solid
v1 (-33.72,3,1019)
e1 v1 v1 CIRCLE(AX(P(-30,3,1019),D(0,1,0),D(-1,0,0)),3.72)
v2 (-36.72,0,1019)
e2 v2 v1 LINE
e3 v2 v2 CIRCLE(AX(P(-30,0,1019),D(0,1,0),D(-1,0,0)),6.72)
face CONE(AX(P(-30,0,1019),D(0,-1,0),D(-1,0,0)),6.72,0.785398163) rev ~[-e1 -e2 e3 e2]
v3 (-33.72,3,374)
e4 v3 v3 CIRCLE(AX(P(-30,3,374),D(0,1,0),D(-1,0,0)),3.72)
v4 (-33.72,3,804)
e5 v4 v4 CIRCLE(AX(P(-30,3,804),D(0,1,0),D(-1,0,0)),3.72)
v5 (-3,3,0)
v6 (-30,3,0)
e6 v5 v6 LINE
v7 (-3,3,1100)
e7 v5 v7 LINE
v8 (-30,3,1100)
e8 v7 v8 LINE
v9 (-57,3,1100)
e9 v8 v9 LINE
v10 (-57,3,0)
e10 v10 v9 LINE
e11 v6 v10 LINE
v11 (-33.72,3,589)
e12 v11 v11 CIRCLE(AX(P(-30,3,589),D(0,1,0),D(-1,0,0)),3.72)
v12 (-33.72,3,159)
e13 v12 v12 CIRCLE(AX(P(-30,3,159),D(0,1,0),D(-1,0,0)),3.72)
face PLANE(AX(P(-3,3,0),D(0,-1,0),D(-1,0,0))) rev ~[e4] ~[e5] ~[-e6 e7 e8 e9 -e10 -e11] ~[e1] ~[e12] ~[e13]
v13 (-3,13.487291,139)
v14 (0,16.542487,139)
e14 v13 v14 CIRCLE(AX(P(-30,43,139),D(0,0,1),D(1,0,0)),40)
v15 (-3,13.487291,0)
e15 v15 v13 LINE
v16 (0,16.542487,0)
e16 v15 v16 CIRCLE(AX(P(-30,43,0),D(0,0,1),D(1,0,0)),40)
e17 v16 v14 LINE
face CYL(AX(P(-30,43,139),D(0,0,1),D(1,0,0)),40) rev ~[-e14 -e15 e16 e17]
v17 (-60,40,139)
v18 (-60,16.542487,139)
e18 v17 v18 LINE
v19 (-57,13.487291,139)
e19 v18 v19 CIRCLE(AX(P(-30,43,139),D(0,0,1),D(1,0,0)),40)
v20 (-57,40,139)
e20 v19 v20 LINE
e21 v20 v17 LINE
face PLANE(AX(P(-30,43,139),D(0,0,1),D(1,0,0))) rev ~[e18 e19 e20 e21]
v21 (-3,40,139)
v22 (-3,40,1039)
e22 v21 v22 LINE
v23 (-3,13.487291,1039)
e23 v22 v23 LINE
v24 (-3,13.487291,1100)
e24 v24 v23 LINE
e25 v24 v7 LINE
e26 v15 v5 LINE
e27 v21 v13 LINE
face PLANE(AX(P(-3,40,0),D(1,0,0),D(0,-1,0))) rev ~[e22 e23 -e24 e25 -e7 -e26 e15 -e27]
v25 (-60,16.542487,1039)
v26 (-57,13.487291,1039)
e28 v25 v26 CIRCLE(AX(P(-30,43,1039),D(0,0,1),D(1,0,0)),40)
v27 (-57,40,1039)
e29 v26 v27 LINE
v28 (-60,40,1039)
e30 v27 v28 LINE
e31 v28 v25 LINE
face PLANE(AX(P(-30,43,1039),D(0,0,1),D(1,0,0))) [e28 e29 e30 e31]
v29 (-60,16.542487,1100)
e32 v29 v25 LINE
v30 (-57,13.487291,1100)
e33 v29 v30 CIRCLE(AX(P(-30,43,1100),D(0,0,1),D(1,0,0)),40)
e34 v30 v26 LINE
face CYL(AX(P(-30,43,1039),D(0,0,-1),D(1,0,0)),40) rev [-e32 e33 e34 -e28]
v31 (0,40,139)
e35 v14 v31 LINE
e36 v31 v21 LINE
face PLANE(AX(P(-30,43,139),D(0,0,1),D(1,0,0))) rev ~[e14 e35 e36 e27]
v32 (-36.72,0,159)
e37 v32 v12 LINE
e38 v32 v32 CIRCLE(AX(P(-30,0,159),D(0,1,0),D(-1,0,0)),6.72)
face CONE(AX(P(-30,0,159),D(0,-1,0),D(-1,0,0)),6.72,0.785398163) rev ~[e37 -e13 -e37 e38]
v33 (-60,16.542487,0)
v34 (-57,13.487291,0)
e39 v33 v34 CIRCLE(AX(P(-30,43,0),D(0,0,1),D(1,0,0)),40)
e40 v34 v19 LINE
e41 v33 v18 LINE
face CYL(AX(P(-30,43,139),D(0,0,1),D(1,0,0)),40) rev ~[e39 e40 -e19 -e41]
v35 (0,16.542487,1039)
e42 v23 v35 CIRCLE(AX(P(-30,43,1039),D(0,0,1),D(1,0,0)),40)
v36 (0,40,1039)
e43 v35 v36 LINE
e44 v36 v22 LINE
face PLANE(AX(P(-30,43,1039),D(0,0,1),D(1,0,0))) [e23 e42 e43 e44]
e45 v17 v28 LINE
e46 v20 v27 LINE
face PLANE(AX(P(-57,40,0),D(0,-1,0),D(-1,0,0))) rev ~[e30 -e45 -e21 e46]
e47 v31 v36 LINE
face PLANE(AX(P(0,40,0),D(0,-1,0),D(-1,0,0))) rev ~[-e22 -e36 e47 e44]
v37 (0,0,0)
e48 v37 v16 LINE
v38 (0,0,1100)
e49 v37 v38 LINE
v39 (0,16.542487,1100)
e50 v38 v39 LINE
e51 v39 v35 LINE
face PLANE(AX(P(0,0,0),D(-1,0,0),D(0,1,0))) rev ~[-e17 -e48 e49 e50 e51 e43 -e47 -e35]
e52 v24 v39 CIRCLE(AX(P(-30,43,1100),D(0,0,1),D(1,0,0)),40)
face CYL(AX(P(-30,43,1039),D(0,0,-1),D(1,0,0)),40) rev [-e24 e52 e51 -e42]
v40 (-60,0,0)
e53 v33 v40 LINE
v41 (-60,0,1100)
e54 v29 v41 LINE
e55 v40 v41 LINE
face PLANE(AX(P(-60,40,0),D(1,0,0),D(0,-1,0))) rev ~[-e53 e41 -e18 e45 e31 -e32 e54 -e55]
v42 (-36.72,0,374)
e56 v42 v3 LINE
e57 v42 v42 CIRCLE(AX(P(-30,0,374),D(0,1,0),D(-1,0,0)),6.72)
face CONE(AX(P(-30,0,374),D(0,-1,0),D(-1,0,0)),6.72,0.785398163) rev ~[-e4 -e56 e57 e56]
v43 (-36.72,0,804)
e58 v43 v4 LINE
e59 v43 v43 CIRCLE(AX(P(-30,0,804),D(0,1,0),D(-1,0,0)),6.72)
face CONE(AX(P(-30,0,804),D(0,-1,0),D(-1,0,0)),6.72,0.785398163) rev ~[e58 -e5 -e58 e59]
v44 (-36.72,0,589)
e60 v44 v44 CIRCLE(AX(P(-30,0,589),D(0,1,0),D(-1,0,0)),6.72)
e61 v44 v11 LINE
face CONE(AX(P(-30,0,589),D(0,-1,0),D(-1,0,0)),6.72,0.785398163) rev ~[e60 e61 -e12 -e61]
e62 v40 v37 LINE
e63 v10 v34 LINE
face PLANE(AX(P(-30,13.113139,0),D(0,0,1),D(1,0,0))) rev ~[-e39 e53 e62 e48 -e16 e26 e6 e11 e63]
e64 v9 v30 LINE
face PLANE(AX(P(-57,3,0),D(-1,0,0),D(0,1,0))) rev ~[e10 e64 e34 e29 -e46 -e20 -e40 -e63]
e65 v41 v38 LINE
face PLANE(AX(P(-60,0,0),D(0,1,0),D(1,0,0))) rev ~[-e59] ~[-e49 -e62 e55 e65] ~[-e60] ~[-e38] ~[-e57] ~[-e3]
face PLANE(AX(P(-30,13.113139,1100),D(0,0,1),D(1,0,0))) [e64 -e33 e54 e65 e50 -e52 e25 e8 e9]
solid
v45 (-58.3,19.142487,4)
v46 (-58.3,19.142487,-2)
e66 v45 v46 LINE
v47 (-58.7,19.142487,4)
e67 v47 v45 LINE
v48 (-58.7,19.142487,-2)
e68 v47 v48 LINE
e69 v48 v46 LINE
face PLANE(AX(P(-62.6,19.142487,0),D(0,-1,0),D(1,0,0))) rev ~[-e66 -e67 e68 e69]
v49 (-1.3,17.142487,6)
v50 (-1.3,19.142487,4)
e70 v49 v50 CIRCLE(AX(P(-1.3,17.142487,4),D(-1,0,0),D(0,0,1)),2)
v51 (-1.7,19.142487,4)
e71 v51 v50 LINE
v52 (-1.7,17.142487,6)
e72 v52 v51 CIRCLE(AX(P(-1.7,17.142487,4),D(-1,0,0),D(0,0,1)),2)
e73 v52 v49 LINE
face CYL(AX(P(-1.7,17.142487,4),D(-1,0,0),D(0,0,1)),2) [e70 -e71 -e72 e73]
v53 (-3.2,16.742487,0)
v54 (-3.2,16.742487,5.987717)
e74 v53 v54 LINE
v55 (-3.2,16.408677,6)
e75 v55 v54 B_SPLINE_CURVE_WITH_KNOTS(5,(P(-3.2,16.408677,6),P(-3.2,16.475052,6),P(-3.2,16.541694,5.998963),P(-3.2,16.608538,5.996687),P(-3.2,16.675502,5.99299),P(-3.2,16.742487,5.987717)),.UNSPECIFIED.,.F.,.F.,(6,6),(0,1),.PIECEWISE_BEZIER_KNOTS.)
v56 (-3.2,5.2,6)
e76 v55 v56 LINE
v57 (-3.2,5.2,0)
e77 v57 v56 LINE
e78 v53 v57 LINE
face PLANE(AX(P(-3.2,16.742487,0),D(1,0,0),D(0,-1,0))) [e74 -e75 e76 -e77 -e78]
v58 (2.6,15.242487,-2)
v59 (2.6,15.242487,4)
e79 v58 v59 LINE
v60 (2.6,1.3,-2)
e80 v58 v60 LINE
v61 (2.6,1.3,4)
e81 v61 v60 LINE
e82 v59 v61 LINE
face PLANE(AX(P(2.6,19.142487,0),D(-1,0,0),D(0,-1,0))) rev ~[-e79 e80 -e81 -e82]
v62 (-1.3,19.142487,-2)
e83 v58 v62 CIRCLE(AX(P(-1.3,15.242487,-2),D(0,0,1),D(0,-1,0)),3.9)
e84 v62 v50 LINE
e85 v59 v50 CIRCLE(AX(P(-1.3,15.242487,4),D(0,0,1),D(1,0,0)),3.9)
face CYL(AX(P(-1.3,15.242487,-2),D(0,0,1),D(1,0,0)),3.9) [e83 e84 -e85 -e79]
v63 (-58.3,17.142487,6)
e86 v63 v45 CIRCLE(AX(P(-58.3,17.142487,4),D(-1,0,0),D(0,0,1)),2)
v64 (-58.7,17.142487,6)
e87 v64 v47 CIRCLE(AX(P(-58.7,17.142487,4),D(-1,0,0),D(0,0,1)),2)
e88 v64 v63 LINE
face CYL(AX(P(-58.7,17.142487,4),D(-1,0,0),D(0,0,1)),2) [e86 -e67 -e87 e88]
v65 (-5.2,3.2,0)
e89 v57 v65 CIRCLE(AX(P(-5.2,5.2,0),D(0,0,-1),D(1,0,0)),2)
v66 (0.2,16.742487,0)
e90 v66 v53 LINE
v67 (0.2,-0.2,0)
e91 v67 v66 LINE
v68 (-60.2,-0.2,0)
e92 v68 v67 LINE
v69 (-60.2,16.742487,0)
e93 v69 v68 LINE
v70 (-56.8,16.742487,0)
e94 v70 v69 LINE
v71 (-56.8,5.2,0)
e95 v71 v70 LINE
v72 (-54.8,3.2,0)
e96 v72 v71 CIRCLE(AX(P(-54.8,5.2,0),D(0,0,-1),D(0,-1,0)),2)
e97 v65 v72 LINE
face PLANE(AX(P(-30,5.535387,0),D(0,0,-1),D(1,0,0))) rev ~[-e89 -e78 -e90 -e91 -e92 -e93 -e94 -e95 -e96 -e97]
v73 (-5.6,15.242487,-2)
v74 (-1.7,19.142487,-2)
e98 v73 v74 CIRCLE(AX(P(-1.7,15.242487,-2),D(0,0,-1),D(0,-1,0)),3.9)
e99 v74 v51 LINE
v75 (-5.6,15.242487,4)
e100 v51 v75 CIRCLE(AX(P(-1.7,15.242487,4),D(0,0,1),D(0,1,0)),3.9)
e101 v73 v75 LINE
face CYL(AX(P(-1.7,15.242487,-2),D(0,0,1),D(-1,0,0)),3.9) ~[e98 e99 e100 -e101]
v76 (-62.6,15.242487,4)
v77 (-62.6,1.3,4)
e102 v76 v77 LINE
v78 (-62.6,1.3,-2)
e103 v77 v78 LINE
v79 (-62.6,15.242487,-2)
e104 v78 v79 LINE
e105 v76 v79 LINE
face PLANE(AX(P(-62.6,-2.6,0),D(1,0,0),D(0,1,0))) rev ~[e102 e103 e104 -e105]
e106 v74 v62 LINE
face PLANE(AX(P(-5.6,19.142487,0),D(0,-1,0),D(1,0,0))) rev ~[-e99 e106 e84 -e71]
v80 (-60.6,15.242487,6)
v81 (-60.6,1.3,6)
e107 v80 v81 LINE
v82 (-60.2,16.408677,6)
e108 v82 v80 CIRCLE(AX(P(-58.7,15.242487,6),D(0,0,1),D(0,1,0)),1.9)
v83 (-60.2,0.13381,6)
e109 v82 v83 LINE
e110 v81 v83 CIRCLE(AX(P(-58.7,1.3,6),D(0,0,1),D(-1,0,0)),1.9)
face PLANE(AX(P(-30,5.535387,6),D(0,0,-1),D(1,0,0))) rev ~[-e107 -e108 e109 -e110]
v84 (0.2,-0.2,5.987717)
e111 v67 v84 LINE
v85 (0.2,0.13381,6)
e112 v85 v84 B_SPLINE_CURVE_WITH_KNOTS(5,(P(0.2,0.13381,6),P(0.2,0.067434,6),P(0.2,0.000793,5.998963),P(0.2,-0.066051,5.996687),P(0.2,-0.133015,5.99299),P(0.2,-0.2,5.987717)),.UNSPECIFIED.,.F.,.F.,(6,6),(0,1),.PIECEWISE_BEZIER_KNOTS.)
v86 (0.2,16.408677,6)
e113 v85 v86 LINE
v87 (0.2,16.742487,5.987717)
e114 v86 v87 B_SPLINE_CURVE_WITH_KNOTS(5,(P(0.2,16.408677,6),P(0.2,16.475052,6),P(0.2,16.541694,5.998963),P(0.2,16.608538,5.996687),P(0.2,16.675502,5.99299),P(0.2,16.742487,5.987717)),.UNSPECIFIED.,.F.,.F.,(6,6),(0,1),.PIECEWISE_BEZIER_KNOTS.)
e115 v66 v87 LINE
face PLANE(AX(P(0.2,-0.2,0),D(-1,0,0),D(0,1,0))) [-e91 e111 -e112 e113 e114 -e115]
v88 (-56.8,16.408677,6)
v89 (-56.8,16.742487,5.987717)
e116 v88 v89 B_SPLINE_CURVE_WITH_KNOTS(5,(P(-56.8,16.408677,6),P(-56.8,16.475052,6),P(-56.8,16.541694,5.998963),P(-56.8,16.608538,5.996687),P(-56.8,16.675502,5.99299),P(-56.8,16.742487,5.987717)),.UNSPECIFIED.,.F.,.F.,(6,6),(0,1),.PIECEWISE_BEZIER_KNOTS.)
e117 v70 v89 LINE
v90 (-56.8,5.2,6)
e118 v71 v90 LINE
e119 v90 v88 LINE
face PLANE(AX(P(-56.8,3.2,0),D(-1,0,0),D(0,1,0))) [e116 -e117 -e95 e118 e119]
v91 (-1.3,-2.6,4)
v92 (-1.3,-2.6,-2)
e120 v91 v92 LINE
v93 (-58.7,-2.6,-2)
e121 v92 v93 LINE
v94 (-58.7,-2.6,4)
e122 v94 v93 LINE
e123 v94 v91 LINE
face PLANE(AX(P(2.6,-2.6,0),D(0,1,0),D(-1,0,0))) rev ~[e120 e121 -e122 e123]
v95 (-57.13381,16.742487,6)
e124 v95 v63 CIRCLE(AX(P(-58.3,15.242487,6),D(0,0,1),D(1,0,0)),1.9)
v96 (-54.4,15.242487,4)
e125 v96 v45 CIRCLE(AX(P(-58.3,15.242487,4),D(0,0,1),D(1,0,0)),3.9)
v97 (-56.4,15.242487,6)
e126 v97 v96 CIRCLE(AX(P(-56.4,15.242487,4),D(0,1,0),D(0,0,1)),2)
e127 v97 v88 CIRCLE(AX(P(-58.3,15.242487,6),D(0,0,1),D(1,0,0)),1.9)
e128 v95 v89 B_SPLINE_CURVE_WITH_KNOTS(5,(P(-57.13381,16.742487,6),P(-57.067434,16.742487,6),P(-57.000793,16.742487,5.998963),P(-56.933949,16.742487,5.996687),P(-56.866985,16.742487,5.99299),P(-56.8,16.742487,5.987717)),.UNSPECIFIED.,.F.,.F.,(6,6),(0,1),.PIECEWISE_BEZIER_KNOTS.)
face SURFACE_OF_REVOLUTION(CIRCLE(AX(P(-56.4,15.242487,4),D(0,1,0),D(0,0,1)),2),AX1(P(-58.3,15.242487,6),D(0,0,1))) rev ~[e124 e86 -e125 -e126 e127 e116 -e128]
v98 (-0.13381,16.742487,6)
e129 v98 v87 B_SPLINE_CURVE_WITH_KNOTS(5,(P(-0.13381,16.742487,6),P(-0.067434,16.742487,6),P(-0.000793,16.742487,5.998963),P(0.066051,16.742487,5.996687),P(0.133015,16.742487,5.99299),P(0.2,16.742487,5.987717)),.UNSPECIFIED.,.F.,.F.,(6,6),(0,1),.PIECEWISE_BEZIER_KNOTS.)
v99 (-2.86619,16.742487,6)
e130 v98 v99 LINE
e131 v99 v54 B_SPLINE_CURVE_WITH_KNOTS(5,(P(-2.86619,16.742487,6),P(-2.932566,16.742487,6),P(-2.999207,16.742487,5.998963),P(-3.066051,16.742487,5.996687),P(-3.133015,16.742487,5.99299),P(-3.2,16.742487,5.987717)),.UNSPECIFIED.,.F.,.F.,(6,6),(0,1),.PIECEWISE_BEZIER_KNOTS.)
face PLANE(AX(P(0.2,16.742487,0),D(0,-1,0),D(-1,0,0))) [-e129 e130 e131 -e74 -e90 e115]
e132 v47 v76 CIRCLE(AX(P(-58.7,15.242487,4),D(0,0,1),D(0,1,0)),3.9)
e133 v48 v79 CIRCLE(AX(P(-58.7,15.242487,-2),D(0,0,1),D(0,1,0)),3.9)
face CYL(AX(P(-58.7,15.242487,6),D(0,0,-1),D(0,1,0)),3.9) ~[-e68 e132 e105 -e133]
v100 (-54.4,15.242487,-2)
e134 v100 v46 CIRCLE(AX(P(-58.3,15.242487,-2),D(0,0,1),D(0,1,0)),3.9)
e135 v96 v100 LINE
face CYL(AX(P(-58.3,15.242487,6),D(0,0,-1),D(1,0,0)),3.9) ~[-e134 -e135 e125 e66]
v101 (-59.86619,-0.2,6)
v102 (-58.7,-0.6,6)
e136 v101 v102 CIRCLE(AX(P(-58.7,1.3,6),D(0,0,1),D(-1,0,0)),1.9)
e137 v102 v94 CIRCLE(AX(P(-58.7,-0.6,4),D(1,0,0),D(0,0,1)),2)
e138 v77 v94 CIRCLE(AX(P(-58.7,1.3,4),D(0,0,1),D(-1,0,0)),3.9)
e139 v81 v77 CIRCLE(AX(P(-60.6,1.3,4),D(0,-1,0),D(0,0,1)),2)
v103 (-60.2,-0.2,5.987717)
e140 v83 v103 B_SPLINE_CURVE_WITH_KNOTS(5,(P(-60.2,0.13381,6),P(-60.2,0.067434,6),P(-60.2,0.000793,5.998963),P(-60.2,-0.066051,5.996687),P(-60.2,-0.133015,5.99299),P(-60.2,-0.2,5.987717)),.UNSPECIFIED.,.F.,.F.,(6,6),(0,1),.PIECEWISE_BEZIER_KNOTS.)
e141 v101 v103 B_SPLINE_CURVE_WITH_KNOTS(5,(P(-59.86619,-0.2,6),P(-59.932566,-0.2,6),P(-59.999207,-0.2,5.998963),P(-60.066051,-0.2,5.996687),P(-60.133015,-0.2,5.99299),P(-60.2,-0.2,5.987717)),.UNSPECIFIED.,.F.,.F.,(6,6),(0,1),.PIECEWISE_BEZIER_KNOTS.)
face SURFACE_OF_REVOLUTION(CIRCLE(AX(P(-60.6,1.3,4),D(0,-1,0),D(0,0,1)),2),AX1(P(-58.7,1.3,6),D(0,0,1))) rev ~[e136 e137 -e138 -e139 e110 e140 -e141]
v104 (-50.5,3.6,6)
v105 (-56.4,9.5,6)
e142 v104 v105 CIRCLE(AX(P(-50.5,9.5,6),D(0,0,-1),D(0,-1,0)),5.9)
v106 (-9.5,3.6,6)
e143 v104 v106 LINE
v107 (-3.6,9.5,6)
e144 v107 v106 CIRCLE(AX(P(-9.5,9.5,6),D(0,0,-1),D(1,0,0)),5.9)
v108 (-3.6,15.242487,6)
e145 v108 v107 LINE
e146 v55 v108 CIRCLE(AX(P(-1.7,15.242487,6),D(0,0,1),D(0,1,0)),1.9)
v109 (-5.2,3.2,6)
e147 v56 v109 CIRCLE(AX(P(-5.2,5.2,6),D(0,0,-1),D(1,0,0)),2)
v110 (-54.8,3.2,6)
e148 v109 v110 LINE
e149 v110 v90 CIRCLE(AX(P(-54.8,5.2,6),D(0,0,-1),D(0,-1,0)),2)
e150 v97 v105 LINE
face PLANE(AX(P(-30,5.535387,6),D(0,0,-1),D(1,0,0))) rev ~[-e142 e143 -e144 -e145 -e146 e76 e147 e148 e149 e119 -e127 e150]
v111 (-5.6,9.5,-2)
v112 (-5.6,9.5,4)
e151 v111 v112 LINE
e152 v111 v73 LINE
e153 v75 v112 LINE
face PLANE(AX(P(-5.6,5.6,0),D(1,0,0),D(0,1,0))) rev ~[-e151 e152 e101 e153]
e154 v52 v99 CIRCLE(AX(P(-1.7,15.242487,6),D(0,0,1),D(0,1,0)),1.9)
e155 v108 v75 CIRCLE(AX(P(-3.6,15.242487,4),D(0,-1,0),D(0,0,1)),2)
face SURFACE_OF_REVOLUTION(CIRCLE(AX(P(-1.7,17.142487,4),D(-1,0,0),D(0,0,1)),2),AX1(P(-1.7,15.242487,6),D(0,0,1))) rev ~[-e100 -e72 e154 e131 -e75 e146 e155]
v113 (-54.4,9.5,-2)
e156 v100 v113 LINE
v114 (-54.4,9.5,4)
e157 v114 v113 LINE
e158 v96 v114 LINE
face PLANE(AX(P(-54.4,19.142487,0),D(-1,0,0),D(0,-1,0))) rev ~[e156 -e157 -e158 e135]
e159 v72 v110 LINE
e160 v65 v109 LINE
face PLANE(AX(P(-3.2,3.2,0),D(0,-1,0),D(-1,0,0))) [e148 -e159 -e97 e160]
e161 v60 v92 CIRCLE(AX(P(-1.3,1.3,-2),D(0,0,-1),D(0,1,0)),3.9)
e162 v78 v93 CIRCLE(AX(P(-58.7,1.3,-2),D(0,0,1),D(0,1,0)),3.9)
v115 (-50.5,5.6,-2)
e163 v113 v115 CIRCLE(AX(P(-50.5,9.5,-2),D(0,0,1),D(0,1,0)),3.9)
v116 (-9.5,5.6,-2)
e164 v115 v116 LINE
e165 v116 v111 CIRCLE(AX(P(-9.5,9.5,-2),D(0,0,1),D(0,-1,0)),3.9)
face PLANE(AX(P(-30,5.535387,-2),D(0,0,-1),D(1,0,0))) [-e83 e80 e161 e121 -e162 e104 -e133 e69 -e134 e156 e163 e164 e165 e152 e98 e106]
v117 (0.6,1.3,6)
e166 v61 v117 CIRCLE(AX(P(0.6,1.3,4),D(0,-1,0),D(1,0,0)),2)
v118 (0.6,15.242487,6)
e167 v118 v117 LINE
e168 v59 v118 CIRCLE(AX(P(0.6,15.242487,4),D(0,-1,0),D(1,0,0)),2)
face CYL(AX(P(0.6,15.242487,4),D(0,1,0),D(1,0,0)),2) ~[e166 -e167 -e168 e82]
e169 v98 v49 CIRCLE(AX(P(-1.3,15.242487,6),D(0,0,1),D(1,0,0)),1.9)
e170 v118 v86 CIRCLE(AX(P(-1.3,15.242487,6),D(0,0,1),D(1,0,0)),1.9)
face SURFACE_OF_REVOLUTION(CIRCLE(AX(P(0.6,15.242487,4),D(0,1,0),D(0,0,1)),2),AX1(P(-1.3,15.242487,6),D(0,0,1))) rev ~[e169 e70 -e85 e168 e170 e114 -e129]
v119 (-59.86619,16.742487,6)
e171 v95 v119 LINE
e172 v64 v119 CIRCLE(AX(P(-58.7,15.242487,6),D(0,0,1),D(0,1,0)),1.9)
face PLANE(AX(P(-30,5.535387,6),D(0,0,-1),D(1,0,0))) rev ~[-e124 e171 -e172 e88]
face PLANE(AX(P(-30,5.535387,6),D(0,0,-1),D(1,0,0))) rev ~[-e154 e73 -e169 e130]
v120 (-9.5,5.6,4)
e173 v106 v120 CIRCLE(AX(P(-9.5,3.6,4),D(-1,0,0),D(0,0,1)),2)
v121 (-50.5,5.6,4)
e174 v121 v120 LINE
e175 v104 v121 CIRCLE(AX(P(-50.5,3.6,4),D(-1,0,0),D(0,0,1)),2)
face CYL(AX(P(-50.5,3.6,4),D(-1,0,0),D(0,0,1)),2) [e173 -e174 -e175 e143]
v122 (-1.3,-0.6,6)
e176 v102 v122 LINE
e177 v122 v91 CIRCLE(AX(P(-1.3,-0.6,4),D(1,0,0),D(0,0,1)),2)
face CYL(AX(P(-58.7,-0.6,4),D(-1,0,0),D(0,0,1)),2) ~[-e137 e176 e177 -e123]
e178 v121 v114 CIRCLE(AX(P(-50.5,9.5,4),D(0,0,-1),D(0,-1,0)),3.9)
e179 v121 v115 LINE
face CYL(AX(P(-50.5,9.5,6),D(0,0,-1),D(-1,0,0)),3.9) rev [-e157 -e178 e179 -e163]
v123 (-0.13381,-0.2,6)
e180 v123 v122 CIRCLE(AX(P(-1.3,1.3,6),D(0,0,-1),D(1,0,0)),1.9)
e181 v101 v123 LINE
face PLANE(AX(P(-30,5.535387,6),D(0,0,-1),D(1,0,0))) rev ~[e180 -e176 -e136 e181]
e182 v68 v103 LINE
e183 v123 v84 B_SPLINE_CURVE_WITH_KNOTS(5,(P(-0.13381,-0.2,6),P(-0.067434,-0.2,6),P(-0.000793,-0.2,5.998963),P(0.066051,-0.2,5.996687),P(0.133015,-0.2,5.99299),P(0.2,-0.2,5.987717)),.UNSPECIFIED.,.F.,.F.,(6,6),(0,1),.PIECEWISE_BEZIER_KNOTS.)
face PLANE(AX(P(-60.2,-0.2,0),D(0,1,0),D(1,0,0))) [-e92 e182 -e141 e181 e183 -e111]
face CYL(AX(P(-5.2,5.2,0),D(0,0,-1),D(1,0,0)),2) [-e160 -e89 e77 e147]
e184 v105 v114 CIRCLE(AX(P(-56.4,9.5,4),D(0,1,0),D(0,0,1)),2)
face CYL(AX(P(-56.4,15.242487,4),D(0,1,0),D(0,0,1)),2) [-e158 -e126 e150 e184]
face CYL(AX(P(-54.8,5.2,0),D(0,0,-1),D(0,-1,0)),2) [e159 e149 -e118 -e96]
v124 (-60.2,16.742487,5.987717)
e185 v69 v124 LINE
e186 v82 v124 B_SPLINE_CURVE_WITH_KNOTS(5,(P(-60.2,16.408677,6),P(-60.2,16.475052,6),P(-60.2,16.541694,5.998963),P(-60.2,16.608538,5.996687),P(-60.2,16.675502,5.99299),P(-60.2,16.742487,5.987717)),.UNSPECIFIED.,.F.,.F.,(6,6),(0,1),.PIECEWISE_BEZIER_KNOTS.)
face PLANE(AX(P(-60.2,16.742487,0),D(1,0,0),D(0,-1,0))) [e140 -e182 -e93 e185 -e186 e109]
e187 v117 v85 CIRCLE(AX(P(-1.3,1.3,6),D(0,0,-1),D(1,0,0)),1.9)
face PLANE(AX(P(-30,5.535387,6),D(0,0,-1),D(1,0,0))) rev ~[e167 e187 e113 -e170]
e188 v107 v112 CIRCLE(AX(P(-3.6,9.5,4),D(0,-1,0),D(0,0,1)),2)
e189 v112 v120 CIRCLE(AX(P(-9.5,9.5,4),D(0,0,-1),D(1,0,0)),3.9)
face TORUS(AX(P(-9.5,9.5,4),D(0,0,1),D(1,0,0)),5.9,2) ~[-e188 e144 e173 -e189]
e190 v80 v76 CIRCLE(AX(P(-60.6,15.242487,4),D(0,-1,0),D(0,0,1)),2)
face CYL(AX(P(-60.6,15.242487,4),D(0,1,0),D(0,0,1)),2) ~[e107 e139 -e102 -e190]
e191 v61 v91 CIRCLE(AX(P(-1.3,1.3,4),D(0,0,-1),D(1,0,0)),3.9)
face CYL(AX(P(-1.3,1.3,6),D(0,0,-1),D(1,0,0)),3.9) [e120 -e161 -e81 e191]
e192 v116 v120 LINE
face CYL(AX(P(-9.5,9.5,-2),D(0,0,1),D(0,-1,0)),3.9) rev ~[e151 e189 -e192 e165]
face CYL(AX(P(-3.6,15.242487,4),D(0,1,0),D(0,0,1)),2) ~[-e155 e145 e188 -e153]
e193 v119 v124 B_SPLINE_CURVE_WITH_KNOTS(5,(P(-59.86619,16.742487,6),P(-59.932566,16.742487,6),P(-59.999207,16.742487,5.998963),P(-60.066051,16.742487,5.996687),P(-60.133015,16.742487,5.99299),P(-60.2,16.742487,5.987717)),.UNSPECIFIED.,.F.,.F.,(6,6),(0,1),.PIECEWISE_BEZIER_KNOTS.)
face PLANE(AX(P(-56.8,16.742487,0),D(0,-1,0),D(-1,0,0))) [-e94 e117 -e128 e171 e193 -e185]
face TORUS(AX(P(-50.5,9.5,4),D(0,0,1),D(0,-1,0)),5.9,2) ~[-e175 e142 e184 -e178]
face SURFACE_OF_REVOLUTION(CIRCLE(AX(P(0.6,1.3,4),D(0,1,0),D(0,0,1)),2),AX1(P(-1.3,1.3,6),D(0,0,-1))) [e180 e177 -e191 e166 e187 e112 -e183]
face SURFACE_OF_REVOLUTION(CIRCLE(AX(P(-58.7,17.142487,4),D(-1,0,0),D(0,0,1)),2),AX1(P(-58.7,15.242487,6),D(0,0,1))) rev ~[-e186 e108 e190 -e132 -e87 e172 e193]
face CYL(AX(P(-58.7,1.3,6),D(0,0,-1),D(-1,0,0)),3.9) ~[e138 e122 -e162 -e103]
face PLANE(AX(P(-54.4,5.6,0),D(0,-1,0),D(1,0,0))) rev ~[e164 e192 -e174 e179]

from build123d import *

# Parameters (mm, degrees)
F1_DEPTH        = 1100
F7_R            = 40
F8_DEPTH        = 139
F10_R           = 40
F11_DEPTH       = 61
F13_D           = 6.6
F13_CSINK_D     = 13.44
F13_CSINK_ANGLE = 90
F15_DEPTH       = 6
F16_DEPTH       = 2
F17_R           = 3.9
F18_T1_DEPTH    = 13.9424868894
F18_T3_DEPTH    = 11
F18_T5_DEPTH    = 0.4
F18_T7_DEPTH    = 57.4
F18_T9_DEPTH    = 5.7424868894
F18_T11_DEPTH   = 41
F18_T13_DEPTH   = 0.4
F18_T16_ANGLE   = 90
F18_T18_ANGLE   = 90
F18_T20_ANGLE   = 90
F18_T22_ANGLE   = 90
F18_T24_ANGLE   = 90
F18_T26_ANGLE   = 90
F18_T28_ANGLE   = 90
F18_T30_ANGLE   = 90


# Not quite as in the source:
# - a fillet or chamfer that OpenCascade refuses, or shapes differently, is made with other operations: its cross-section is extruded or revolved along the edge and cut away or added


with BuildPart() as f1:
    # F0 (on Top) → F1 (new body)
    with BuildSketch(Plane.XY):
        Polygon((-60, 0), (0, 0), (0, 40), (-3, 40), (-3, 3), (-57, 3), (-57, 40), (-60, 40), align=None)
    extrude(amount=F1_DEPTH)

    # F7 (on offset) → F8 (cut, through all)
    with BuildSketch(Plane.XY.offset(139)):
        with Locations((-30, 43)):
            Circle(F7_R)
    extrude(amount=-F8_DEPTH, mode=Mode.SUBTRACT)

    # F10 (on offset) → F11 (cut, through all)
    with BuildSketch(Plane.XY.offset(1039)):
        with Locations((-30, 43)):
            Circle(F10_R)
    extrude(amount=F11_DEPTH, mode=Mode.SUBTRACT)

    # F13 (through all)
    with Locations(Plane.XZ):
        with Locations((-30, 159), (-30, 374), (-30, 589), (-30, 804), (-30, 1019)):
            CounterSinkHole(F13_D / 2, F13_CSINK_D / 2, counter_sink_angle=F13_CSINK_ANGLE)


with BuildPart() as f15:
    # F14 (on face) → F15 (new body)
    with BuildSketch(Plane(origin=(0, 0, 0), x_dir=(1, 0, 0), z_dir=(0, 0, -1))):
        Polygon((2.6, -19.1424868894), (2.6, 2.6), (-62.6, 2.6), (-62.6, -19.1424868894), (-54.4, -19.1424868894), (-54.4, -5.6), (-5.6, -5.6), (-5.6, -19.1424868894), align=None)
        Polygon((-60.2, 0.2), (0.2, 0.2), (0.2, -16.7424868894), (-3.2, -16.7424868894), (-3.2, -3.2), (-56.8, -3.2), (-56.8, -16.7424868894), (-60.2, -16.7424868894), align=None, mode=Mode.SUBTRACT)
    extrude(amount=-F15_DEPTH)

    # F14 (on face) → F16 (join)
    with BuildSketch(Plane(origin=(0, 0, 0), x_dir=(1, 0, 0), z_dir=(0, 0, -1))):
        Polygon((2.6, -19.1424868894), (2.6, 2.6), (-62.6, 2.6), (-62.6, -19.1424868894), (-54.4, -19.1424868894), (-54.4, -5.6), (-5.6, -5.6), (-5.6, -19.1424868894), align=None)
        Polygon((-60.2, 0.2), (0.2, 0.2), (0.2, -16.7424868894), (-3.2, -16.7424868894), (-3.2, -3.2), (-56.8, -3.2), (-56.8, -16.7424868894), (-60.2, -16.7424868894), align=None, mode=Mode.SUBTRACT)
        Polygon((0.2, -16.7424868894), (0.2, 0.2), (-60.2, 0.2), (-60.2, -16.7424868894), (-56.8, -16.7424868894), (-56.8, -3.2), (-3.2, -3.2), (-3.2, -16.7424868894), align=None)
        with BuildLine():
            Line((-60, -16.5424868894), (-60, 0))
            Line((-60, 0), (0, 0))
            Line((0, 0), (0, -16.5424868894))
            ThreePointArc((0, -16.5424868894), (-1.459089789, -14.9747177655), (-3, -13.4872908733))
            Line((-3, -13.4872908733), (-3, -3))
            Line((-3, -3), (-30, -3))
            Line((-30, -3), (-57, -3))
            Line((-57, -3), (-57, -13.4872908733))
            ThreePointArc((-57, -13.4872908733), (-58.540910211, -14.9747177655), (-60, -16.5424868894))
        make_face(mode=Mode.SUBTRACT)
        with BuildLine():
            Line((0, 0), (-60, 0))
            Line((-60, 0), (-60, -16.5424868894))
            ThreePointArc((-60, -16.5424868894), (-58.540910211, -14.9747177655), (-57, -13.4872908733))
            Line((-57, -13.4872908733), (-57, -3))
            Line((-57, -3), (-30, -3))
            Line((-30, -3), (-3, -3))
            Line((-3, -3), (-3, -13.4872908733))
            ThreePointArc((-3, -13.4872908733), (-1.459089789, -14.9747177655), (0, -16.5424868894))
            Line((0, -16.5424868894), (0, 0))
        make_face()
    extrude(amount=F16_DEPTH)

    # F17
    f17_edges = [f15.edges().sort_by_distance(p)[0] for p in [
        (2.6, 19.142487, 2),
        (-5.6, 19.142487, 2),
        (-5.6, 5.6, 2),
        (-54.4, 19.142487, 2),
        (-62.6, 19.142487, 2),
        (-54.4, 5.6, 2),
        (-62.6, -2.6, 2),
        (2.6, -2.6, 2),
    ]]
    fillet(f17_edges, radius=F17_R)

    # F18: fillet of radius 2 on 18 edges, made by hand

    # F18_s2 → F18_t1 (cut)
    with BuildSketch(Plane.XZ.offset(-15.2424868894)):
        with BuildLine():
            ThreePointArc((2.6, 4), (2.0142135624, 5.4142135624), (0.6, 6))
            Line((0.6, 6), (2.6, 6))
            Line((2.6, 6), (2.6, 4))
        make_face()
        with BuildLine():
            ThreePointArc((-60.6, 6), (-62.0142135624, 5.4142135624), (-62.6, 4))
            Line((-62.6, 4), (-62.6, 6))
            Line((-62.6, 6), (-60.6, 6))
        make_face()
    extrude(amount=F18_T1_DEPTH, mode=Mode.SUBTRACT)

    # F18_s4 → F18_t3 (cut)
    with BuildSketch(Plane.XY):
        with BuildLine():
            ThreePointArc((-3.2, 5.2), (-3.7857864376, 3.7857864376), (-5.2, 3.2))
            Line((-5.2, 3.2), (-3.2, 3.2))
            Line((-3.2, 3.2), (-3.2, 5.2))
        make_face()
        with BuildLine():
            ThreePointArc((-54.8, 3.2), (-56.2142135624, 3.7857864376), (-56.8, 5.2))
            Line((-56.8, 5.2), (-56.8, 3.2))
            Line((-56.8, 3.2), (-54.8, 3.2))
        make_face()
    extrude(amount=F18_T3_DEPTH, mode=Mode.SUBTRACT)

    # F18_s6 → F18_t5 (cut)
    with BuildSketch(Plane.YZ.offset(-1.7)):
        with BuildLine():
            ThreePointArc((17.1424868894, 6), (18.5567004517, 5.4142135624), (19.1424868894, 4))
            Line((19.1424868894, 4), (19.1424868894, 6))
            Line((19.1424868894, 6), (17.1424868894, 6))
        make_face()
    extrude(amount=F18_T5_DEPTH, mode=Mode.SUBTRACT)

    # F18_s8 → F18_t7 (cut)
    with BuildSketch(Plane.YZ.offset(-58.7)):
        with BuildLine():
            ThreePointArc((-0.6, 6), (-2.0142135624, 5.4142135624), (-2.6, 4))
            Line((-2.6, 4), (-2.6, 6))
            Line((-2.6, 6), (-0.6, 6))
        make_face()
    extrude(amount=F18_T7_DEPTH, mode=Mode.SUBTRACT)

    # F18_s10 → F18_t9 (cut)
    with BuildSketch(Plane.XZ.offset(-15.2424868894)):
        with BuildLine():
            ThreePointArc((-3.6, 6), (-5.0142135624, 5.4142135624), (-5.6, 4))
            Line((-5.6, 4), (-5.6, 6))
            Line((-5.6, 6), (-3.6, 6))
        make_face()
        with BuildLine():
            ThreePointArc((-56.4, 6), (-54.9857864376, 5.4142135624), (-54.4, 4))
            Line((-54.4, 4), (-54.4, 6))
            Line((-54.4, 6), (-56.4, 6))
        make_face()
    extrude(amount=F18_T9_DEPTH, mode=Mode.SUBTRACT)

    # F18_s12 → F18_t11 (cut)
    with BuildSketch(Plane.YZ.offset(-50.5)):
        with BuildLine():
            ThreePointArc((3.6, 6), (5.0142135624, 5.4142135624), (5.6, 4))
            Line((5.6, 4), (5.6, 6))
            Line((5.6, 6), (3.6, 6))
        make_face()
    extrude(amount=F18_T11_DEPTH, mode=Mode.SUBTRACT)

    # F18_s14 → F18_t13 (cut)
    with BuildSketch(Plane.YZ.offset(-58.7)):
        with BuildLine():
            ThreePointArc((17.1424868894, 6), (18.5567004517, 5.4142135624), (19.1424868894, 4))
            Line((19.1424868894, 4), (19.1424868894, 6))
            Line((19.1424868894, 6), (17.1424868894, 6))
        make_face()
    extrude(amount=F18_T13_DEPTH, mode=Mode.SUBTRACT)

    # F18_s15 → F18_t16 (revolve, cut)
    with BuildSketch(Plane.XZ.offset(-15.2424868894)):
        with BuildLine():
            ThreePointArc((0.6, 6), (2.0142135624, 5.4142135624), (2.6, 4))
            Line((2.6, 4), (2.6, 6))
            Line((2.6, 6), (0.6, 6))
        make_face()
    revolve(axis=Axis((-1.3, 15.2424868894, 6), (0, 0, 1)), revolution_arc=F18_T16_ANGLE, mode=Mode.SUBTRACT)

    # F18_s17 → F18_t18 (revolve, cut)
    with BuildSketch(Plane.XZ.offset(-1.3)):
        with BuildLine():
            ThreePointArc((0.6, 6), (2.0142135624, 5.4142135624), (2.6, 4))
            Line((2.6, 4), (2.6, 6))
            Line((2.6, 6), (0.6, 6))
        make_face()
    revolve(axis=Axis((-1.3, 1.3, 6), (0, 0, -1)), revolution_arc=F18_T18_ANGLE, mode=Mode.SUBTRACT)

    # F18_s19 → F18_t20 (revolve, cut)
    with BuildSketch(Plane.YZ.offset(-1.7)):
        with BuildLine():
            ThreePointArc((17.1424868894, 6), (18.5567004517, 5.4142135624), (19.1424868894, 4))
            Line((19.1424868894, 4), (19.1424868894, 6))
            Line((19.1424868894, 6), (17.1424868894, 6))
        make_face()
    revolve(axis=Axis((-1.7, 15.2424868894, 6), (0, 0, 1)), revolution_arc=F18_T20_ANGLE, mode=Mode.SUBTRACT)

    # F18_s21 → F18_t22 (revolve, cut)
    with BuildSketch(Plane.XZ.offset(-1.3)):
        with BuildLine():
            ThreePointArc((-60.6, 6), (-62.0142135624, 5.4142135624), (-62.6, 4))
            Line((-62.6, 4), (-62.6, 6))
            Line((-62.6, 6), (-60.6, 6))
        make_face()
    revolve(axis=Axis((-58.7, 1.3, 6), (0, 0, 1)), revolution_arc=F18_T22_ANGLE, mode=Mode.SUBTRACT)

    # F18_s23 → F18_t24 (revolve, cut)
    with BuildSketch(Plane.XZ.offset(-9.5)):
        with BuildLine():
            ThreePointArc((-3.6, 6), (-5.0142135624, 5.4142135624), (-5.6, 4))
            Line((-5.6, 4), (-5.6, 6))
            Line((-5.6, 6), (-3.6, 6))
        make_face()
    revolve(axis=Axis((-9.5, 9.5, 6), (0, 0, -1)), revolution_arc=F18_T24_ANGLE, mode=Mode.SUBTRACT)

    # F18_s25 → F18_t26 (revolve, cut)
    with BuildSketch(Plane.YZ.offset(-58.7)):
        with BuildLine():
            ThreePointArc((17.1424868894, 6), (18.5567004517, 5.4142135624), (19.1424868894, 4))
            Line((19.1424868894, 4), (19.1424868894, 6))
            Line((19.1424868894, 6), (17.1424868894, 6))
        make_face()
    revolve(axis=Axis((-58.7, 15.2424868894, 6), (0, 0, 1)), revolution_arc=F18_T26_ANGLE, mode=Mode.SUBTRACT)

    # F18_s27 → F18_t28 (revolve, cut)
    with BuildSketch(Plane.YZ.offset(-50.5)):
        with BuildLine():
            ThreePointArc((3.6, 6), (5.0142135624, 5.4142135624), (5.6, 4))
            Line((5.6, 4), (5.6, 6))
            Line((5.6, 6), (3.6, 6))
        make_face()
    revolve(axis=Axis((-50.5, 9.5, 6), (0, 0, -1)), revolution_arc=F18_T28_ANGLE, mode=Mode.SUBTRACT)

    # F18_s29 → F18_t30 (revolve, cut)
    with BuildSketch(Plane.XZ.offset(-15.2424868894)):
        with BuildLine():
            ThreePointArc((-56.4, 6), (-54.9857864376, 5.4142135624), (-54.4, 4))
            Line((-54.4, 4), (-54.4, 6))
            Line((-54.4, 6), (-56.4, 6))
        make_face()
    revolve(axis=Axis((-58.3, 15.2424868894, 6), (0, 0, 1)), revolution_arc=F18_T30_ANGLE, mode=Mode.SUBTRACT)


solid = Compound([f1.part, f15.part])
